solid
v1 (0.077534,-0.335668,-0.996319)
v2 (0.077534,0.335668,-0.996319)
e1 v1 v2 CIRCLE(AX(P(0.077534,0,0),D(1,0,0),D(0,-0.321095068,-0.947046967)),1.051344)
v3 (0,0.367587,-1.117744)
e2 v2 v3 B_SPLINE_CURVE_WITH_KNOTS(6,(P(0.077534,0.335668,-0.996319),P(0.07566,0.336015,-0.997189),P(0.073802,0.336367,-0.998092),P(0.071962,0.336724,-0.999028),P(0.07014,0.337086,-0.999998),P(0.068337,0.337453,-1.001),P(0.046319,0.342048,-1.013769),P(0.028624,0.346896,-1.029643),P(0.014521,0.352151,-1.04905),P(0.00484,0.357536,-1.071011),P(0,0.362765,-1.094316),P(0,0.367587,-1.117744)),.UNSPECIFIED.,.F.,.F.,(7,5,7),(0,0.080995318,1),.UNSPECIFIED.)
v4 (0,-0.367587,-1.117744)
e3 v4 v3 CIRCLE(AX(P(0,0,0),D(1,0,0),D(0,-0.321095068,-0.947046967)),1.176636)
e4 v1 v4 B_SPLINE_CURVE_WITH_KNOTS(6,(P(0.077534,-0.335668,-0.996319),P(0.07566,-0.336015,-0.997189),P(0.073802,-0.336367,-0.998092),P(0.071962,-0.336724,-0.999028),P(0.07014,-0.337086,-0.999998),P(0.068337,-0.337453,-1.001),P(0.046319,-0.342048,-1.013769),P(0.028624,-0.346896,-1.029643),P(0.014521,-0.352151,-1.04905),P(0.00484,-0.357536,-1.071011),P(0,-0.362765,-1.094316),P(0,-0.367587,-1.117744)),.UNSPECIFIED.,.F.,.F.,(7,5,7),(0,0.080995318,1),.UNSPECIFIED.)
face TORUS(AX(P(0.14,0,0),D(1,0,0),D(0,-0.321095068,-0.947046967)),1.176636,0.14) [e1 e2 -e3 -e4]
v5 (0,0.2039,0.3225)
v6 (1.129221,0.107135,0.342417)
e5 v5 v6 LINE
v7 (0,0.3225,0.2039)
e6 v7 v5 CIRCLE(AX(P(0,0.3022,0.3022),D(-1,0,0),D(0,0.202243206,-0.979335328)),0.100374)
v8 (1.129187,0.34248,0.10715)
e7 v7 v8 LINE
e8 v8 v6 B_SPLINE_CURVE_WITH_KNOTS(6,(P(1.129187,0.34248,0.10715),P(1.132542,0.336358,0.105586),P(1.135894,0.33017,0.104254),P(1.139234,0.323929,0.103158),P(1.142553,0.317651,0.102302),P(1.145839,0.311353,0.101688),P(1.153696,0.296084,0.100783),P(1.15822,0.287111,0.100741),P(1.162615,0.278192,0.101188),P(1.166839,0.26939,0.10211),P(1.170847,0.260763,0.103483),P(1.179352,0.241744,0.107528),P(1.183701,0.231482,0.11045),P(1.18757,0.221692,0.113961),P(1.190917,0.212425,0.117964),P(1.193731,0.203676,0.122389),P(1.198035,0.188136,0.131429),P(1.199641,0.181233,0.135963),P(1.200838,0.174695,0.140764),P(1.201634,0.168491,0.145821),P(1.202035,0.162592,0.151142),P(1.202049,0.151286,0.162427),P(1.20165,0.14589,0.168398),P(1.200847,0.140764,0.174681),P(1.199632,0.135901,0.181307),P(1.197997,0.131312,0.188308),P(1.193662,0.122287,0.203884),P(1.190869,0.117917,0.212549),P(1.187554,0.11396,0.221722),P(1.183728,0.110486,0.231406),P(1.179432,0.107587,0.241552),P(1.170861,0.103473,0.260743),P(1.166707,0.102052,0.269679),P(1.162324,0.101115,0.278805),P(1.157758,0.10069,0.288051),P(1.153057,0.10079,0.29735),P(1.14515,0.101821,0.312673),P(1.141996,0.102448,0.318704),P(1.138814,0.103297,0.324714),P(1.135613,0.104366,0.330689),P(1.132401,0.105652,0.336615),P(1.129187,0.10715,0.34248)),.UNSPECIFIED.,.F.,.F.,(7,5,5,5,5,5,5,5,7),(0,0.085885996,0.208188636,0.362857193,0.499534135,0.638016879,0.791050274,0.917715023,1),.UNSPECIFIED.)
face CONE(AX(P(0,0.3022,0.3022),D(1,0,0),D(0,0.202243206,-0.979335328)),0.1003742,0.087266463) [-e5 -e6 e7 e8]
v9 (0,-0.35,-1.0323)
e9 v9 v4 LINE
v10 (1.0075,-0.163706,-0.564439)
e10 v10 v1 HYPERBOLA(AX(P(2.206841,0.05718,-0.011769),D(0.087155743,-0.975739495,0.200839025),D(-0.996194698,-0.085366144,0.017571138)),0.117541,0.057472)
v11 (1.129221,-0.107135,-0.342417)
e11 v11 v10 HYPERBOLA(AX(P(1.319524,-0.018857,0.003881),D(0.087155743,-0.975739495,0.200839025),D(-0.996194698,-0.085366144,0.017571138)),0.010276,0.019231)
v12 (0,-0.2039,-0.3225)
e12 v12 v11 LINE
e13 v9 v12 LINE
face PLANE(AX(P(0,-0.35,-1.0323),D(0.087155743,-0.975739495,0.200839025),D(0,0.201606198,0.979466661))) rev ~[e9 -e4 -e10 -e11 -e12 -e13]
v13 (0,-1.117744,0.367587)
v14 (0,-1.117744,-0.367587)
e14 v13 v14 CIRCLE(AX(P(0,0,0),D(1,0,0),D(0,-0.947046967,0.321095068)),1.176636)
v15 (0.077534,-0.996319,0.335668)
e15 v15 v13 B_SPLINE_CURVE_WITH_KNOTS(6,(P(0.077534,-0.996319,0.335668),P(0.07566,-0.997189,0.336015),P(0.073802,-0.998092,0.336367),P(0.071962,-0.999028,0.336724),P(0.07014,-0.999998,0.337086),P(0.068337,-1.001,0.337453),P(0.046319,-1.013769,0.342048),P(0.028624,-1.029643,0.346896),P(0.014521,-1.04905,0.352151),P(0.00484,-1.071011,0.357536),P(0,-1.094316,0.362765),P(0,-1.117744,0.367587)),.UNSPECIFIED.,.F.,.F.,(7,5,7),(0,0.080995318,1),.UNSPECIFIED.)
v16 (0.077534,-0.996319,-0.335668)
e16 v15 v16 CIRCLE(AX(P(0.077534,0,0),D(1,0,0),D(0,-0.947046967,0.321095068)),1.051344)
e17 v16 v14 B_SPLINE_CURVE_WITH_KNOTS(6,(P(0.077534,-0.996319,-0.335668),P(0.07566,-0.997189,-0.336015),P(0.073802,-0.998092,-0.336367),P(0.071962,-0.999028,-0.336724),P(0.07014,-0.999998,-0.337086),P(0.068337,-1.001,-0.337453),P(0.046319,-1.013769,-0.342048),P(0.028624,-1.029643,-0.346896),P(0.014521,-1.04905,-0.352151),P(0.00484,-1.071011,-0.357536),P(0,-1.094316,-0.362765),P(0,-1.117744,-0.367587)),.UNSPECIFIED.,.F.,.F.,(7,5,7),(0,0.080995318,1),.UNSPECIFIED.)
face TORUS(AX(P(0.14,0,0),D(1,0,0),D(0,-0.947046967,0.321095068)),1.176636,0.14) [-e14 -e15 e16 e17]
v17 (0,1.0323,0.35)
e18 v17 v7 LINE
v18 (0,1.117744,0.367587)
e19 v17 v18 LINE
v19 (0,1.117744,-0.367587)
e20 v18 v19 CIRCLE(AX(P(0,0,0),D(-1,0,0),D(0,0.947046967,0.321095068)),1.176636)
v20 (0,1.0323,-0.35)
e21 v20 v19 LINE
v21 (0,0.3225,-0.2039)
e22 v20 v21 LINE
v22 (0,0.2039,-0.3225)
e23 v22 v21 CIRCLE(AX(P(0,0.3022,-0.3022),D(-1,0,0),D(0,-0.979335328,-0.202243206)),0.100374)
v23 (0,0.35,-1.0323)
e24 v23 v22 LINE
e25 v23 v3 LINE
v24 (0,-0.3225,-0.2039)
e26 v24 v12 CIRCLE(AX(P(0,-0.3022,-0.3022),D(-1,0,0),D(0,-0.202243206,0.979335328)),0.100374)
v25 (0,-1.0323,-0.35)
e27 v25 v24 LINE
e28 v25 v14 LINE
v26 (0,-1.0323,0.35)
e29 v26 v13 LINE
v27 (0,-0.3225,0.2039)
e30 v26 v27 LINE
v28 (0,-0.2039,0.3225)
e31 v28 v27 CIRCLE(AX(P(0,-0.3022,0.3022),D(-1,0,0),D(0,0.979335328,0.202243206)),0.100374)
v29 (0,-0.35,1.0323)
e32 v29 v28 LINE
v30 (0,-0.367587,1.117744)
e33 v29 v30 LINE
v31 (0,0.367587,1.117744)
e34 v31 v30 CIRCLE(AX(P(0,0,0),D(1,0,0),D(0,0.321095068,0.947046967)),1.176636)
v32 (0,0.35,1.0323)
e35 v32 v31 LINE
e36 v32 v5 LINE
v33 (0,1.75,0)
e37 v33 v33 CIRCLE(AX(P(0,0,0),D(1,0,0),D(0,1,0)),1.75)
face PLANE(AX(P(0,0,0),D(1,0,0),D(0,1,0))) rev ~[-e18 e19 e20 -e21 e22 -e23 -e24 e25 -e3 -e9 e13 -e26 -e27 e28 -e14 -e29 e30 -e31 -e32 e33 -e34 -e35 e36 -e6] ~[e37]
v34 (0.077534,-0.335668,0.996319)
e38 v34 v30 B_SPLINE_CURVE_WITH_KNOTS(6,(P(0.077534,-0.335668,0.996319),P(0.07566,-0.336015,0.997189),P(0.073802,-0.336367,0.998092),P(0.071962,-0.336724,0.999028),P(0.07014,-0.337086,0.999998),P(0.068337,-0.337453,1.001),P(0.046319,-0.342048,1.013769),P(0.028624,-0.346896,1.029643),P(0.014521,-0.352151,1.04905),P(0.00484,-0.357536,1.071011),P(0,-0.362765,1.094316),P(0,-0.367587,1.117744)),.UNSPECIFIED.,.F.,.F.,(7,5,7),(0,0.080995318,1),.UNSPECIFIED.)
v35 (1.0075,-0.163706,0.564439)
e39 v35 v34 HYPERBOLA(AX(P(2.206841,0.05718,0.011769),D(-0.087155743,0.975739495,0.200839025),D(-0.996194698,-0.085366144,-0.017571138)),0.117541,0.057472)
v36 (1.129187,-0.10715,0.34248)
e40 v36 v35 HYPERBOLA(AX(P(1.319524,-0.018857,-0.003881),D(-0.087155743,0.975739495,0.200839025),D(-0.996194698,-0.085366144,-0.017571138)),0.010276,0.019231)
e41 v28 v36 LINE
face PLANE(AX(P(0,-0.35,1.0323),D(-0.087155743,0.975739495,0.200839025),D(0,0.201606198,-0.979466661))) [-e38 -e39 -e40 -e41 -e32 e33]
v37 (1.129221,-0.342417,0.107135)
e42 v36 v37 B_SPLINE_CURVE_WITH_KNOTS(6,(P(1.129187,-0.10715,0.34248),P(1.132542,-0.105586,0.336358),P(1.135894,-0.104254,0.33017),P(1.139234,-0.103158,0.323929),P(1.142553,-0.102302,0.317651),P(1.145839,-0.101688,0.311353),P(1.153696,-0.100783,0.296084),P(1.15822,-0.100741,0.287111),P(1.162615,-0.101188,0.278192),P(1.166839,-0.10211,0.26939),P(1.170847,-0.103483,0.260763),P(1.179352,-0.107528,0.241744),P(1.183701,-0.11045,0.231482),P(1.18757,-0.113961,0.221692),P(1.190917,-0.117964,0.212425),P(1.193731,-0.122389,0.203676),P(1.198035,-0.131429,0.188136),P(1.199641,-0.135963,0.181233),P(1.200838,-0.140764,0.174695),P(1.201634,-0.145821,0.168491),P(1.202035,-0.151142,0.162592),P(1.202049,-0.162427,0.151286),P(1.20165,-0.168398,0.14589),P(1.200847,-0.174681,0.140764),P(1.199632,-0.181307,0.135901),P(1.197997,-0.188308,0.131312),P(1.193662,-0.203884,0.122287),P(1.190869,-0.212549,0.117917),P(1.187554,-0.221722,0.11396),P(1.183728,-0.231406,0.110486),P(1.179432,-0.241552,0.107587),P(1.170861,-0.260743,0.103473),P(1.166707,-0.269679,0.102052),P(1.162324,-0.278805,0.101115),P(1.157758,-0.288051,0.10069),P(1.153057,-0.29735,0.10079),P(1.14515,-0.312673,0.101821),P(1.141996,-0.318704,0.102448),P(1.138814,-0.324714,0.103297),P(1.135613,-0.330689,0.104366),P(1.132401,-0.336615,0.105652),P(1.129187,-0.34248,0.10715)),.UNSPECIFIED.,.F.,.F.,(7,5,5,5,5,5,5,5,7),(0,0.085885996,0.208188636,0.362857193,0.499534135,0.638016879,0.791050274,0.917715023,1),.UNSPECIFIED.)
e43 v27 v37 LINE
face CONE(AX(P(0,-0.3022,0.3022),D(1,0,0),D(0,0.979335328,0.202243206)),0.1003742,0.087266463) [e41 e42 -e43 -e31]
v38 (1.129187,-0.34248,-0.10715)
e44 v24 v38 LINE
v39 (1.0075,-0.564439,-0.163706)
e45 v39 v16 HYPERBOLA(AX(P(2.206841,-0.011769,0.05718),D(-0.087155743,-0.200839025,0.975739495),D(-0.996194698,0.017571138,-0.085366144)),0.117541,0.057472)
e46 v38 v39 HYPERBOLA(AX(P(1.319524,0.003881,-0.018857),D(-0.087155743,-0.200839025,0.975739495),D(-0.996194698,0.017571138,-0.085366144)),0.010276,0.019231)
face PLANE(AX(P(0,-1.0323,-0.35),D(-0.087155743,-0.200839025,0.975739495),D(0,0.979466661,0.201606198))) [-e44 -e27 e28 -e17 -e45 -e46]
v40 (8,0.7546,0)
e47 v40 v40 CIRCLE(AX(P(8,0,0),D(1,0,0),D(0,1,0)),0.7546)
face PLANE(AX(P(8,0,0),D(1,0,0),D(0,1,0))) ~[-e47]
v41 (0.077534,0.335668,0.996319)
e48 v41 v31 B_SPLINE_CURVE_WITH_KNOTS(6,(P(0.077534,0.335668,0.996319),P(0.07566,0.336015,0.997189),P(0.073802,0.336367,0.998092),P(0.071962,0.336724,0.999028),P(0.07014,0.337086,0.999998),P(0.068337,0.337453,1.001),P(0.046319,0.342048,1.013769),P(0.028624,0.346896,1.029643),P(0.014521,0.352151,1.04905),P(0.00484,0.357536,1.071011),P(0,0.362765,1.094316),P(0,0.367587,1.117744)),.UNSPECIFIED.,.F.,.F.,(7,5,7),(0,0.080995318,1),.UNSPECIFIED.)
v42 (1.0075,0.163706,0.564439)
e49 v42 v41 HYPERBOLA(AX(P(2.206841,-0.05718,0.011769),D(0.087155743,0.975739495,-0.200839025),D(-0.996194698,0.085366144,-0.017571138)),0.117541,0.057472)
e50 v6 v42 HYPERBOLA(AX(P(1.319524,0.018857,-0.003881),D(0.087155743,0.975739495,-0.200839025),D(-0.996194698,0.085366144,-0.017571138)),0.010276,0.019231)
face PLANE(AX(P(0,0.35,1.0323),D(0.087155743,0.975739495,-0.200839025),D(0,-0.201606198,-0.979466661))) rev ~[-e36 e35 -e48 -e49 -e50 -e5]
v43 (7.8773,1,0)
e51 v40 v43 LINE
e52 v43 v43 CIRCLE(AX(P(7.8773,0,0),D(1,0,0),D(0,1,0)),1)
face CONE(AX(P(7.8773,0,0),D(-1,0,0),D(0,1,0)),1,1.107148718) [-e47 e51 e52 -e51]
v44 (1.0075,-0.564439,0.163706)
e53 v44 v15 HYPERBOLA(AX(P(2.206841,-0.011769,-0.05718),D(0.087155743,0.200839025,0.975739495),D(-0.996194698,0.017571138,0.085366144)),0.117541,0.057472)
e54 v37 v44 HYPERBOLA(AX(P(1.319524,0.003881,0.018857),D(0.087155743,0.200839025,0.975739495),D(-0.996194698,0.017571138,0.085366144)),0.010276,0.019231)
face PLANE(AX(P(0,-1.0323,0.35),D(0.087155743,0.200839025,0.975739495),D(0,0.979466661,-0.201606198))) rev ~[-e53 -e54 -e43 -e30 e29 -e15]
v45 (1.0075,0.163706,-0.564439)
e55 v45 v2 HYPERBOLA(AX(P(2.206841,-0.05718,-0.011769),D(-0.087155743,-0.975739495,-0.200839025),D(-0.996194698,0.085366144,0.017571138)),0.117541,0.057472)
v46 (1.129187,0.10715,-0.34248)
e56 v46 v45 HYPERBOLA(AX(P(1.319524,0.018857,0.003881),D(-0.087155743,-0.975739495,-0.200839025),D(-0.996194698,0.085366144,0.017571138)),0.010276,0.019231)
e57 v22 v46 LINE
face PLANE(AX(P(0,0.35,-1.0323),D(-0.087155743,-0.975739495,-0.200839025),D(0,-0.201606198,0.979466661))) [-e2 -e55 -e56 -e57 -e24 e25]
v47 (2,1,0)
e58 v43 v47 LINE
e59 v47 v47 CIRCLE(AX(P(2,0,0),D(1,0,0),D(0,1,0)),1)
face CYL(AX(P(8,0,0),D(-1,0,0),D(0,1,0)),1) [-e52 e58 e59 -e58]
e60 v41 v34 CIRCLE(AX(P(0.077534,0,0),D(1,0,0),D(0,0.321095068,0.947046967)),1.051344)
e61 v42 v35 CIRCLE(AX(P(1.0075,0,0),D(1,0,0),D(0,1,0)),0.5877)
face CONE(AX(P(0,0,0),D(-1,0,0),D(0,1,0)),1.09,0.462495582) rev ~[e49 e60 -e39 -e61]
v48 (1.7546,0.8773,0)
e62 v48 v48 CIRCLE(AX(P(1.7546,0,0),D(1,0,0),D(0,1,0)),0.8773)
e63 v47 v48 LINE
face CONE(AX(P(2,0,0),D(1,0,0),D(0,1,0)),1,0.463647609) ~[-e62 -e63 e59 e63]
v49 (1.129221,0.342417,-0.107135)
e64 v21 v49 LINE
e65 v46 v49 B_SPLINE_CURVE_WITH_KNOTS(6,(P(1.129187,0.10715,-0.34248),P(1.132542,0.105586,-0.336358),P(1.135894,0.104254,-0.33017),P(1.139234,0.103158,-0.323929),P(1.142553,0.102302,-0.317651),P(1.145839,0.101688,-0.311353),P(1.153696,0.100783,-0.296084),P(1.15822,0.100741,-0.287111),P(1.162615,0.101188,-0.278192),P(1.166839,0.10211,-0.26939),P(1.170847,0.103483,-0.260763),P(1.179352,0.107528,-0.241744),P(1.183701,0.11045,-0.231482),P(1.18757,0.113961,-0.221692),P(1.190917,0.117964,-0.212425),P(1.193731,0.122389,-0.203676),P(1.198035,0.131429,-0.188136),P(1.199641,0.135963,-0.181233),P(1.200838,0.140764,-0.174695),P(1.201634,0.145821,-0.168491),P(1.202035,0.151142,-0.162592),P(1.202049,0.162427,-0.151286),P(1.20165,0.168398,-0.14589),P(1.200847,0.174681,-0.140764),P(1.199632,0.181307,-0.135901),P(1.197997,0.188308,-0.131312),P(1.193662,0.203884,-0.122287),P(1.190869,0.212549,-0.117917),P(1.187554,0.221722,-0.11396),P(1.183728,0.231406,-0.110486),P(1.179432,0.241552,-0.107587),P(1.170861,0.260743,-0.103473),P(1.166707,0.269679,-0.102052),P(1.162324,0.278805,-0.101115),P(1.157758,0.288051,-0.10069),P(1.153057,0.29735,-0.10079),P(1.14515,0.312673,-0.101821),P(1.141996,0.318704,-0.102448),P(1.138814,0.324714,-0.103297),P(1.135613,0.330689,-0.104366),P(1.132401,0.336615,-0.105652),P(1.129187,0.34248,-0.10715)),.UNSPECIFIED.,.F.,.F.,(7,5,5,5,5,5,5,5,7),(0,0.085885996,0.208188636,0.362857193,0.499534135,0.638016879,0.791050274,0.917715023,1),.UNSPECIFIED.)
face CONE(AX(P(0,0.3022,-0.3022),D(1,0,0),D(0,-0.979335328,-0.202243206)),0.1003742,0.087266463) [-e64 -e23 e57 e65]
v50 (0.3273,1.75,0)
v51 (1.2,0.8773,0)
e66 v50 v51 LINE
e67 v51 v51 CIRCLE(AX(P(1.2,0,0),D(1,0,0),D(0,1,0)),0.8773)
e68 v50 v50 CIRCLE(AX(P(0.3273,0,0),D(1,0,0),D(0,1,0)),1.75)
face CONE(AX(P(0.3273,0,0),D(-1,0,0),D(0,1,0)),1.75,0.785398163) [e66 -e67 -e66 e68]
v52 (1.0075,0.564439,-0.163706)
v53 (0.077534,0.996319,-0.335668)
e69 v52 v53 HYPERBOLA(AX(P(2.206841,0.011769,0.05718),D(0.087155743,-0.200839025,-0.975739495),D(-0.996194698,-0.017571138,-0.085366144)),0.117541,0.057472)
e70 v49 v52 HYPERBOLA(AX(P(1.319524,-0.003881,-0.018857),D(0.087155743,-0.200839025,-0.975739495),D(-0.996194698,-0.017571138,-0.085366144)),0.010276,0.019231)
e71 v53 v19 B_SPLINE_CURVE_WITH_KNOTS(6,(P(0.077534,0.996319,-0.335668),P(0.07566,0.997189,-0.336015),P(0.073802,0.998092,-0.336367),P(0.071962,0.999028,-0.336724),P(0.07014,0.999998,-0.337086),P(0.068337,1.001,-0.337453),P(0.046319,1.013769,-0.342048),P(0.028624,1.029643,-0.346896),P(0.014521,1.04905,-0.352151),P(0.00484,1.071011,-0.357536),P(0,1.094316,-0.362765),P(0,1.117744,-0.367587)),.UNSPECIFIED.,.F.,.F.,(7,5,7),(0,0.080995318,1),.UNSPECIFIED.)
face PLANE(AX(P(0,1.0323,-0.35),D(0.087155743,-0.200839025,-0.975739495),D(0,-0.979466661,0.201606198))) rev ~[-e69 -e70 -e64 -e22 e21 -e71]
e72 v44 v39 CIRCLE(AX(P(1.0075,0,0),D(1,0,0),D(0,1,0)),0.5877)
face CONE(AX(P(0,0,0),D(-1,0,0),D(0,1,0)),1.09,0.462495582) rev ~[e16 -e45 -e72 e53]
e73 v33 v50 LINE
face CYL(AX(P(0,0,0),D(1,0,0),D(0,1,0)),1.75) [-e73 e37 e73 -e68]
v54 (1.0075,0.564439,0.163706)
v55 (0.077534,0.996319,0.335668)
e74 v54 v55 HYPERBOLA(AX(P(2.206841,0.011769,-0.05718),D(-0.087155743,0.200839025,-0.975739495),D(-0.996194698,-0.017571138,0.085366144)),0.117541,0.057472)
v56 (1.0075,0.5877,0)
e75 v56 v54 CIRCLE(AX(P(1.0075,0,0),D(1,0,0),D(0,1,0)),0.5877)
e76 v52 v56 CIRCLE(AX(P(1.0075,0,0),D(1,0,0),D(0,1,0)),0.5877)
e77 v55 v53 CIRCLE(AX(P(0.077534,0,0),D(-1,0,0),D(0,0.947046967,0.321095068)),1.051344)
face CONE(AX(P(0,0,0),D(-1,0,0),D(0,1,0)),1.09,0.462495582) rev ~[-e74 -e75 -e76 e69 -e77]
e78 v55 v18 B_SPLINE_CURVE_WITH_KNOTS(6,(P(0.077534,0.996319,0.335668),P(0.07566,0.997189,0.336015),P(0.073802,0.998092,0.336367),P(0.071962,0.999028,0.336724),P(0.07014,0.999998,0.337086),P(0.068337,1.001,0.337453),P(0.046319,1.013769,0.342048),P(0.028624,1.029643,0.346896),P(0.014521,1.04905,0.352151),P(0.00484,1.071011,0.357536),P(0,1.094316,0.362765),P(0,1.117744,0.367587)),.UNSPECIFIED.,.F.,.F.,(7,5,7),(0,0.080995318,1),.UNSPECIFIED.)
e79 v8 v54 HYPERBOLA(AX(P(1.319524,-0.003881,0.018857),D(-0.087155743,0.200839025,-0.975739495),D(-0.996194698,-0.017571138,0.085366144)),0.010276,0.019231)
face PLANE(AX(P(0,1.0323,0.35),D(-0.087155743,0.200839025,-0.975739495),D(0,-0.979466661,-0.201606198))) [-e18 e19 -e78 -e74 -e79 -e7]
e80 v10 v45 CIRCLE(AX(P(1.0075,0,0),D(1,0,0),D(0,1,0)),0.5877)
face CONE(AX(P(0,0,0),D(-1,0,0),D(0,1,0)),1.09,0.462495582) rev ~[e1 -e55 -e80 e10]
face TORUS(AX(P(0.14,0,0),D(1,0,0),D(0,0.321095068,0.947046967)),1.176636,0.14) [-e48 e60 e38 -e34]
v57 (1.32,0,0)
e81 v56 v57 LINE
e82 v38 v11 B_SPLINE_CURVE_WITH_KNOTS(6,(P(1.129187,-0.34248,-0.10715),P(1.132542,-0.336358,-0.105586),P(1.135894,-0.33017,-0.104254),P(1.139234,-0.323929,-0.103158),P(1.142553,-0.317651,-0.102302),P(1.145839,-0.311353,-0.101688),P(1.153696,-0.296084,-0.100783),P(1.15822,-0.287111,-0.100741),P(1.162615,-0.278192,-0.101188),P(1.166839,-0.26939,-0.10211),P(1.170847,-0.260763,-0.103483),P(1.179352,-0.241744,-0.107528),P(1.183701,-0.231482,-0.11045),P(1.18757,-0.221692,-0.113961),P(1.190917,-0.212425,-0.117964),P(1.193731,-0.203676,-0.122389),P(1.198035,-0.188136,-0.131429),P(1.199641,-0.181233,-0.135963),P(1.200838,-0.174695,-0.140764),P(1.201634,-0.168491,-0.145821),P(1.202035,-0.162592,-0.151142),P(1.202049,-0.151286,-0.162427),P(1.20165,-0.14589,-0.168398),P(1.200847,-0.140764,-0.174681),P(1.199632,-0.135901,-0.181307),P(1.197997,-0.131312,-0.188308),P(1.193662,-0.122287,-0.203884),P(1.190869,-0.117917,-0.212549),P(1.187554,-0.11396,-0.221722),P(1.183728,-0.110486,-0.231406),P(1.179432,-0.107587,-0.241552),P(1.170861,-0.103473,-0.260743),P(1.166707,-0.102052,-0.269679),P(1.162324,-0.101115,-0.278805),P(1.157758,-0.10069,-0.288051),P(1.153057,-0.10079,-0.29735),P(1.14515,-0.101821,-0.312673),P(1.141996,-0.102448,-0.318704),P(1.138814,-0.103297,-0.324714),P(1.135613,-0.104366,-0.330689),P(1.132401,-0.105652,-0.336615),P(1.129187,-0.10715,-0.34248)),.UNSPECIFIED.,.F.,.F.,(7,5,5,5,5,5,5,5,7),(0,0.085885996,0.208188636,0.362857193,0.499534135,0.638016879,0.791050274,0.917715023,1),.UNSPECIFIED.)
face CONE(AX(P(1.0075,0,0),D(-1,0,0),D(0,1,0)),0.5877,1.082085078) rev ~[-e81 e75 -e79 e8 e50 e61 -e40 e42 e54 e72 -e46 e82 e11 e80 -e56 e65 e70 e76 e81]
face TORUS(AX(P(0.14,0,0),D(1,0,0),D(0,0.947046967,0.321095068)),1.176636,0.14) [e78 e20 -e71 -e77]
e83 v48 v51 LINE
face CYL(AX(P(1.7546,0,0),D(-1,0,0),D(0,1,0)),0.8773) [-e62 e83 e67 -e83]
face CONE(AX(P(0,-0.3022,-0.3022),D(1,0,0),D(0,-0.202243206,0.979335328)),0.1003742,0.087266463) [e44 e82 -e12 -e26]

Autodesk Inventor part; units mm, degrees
ref_plane "YZ Plane" through (0, 0, 0) normal (1, 0, 0) x (0, 1, 0)
ref_plane "XZ Plane" through (0, 0, 0) normal (0, 1, 0) x (-1, 0, 0)
sketch "Sketch1" plane through (0, 0, 0) normal (0, 0, 1) x (1, 0, 0)
  line L0 (1.32, 0) -> (8, 0)
  line L1 (8, 0) -> (8, 1)
  line L2 (8, 1) -> (2, 1)
  line L3 (2, 1) -> (1.7546, 0.8773)
  line L4 (1.7546, 0.8773) -> (1.2, 0.8773)
  line L5 (0, 1.75) -> (0, 1.09)
  line L6 (0, 1.09) -> (1.0075, 0.5877)
  line L7 (1.0075, 0.5877) -> (1.32, 0)
  line L8 (-1.6, 0) -> (9.6, 0) projected
  line L9 (0, -0.35) -> (0, 2.1) projected
  line L10 (0, 1.75) -> (0.3273, 1.75)
  line L11 (0.3273, 1.75) -> (1.2, 0.8773)
  line L12 (2, 1) -> (1.0773, 1) construction
  dimension "d1" = 6
  dimension "d2" = 2
  dimension "d3" = 1.7546
  dimension "d4" = 2.18
  dimension "d5" = 26.5
  dimension "d6" = 62
  dimension "d7" = 1.32
  dimension "d8" = 0.2454
  dimension "d12" = 3.5
  dimension "d13" = 45
  dimension "d15" = 8
  dimension "d24" = 1.2
revolve "Body" add sketch "Sketch1" angle 360 about axis through (1.32, 0, 0) along (1, 0, 0) contours L7 L6 L5 L10 L11 L4 L3 L2 L1 L0
sketch "Sketch2" plane through (0, 0, 0) normal (-1, 0, 0) x (0, 0, 1)
  line L0 (0, 1.09) -> (0, 0) construction
  line L1 (0, 0) -> (1.09, 0) construction
  arc A0 (0.327, 0) -> (0, 0.327) centre (0, 0) ccw construction
  arc A1 (0.3815, 0) -> (0, 0.3815) centre (0, 0) ccw construction
  arc A2 (1.0323, 0.35) -> (0.35, 1.0323) centre (0, 0) ccw
  line L2 (0, 0) -> (0.7707, 0.7707) construction
  line L3 (0.35, 1.0323) -> (0.2039, 0.3225)
  line L4 (1.0323, 0.35) -> (0.3225, 0.2039)
  arc A3 (0.35, 1.0323) -> (0, 1.09) centre (0, 0) ccw
  arc A4 (1.09, 0) -> (1.0323, 0.35) centre (0, 0) ccw
  line L5 (0, -2.45) -> (0, 2.45) projected
  line L6 (-2.45, 0) -> (2.45, 0) projected
  arc A5 (0.35, -1.0323) -> (1.0323, -0.35) centre (0, 0) ccw
  line L7 (0.35, -1.0323) -> (0.2039, -0.3225)
  line L8 (1.0323, -0.35) -> (0.3225, -0.2039)
  arc A6 (0, -1.09) -> (0.35, -1.0323) centre (0, 0) ccw
  arc A7 (1.0323, -0.35) -> (1.09, 0) centre (0, 0) ccw
  arc A8 (-0.35, 1.0323) -> (-1.0323, 0.35) centre (0, 0) ccw
  line L9 (-0.35, 1.0323) -> (-0.2039, 0.3225)
  line L10 (-1.0323, 0.35) -> (-0.3225, 0.2039)
  arc A9 (0, 1.09) -> (-0.35, 1.0323) centre (0, 0) ccw
  arc A10 (-1.0323, 0.35) -> (-1.09, 0) centre (0, 0) ccw
  arc A11 (-0.35, -1.0323) -> (0, -1.09) centre (0, 0) ccw
  arc A12 (-1.0323, -0.35) -> (-0.35, -1.0323) centre (0, 0) ccw
  arc A13 (-1.09, 0) -> (-1.0323, -0.35) centre (0, 0) ccw
  line L11 (-1.0323, -0.35) -> (-0.3225, -0.2039)
  line L12 (-0.35, -1.0323) -> (-0.2039, -0.3225)
  arc A14 (0.2039, 0.3225) -> (0.3225, 0.2039) centre (0.3022, 0.3022) ccw
  arc A15 (0.3225, -0.2039) -> (0.2039, -0.3225) centre (0.3022, -0.3022) ccw
  arc A16 (-0.3225, 0.2039) -> (-0.2039, 0.3225) centre (-0.3022, 0.3022) ccw
  arc A17 (-0.2039, -0.3225) -> (-0.3225, -0.2039) centre (-0.3022, -0.3022) ccw
  point P0 (0.7707, -0.7707)
  point P1 (-0.7707, 0.7707)
  point P2 (-0.7707, -0.7707)
  dimension "d17" = 0.654
  dimension "d18" = 0.763
  dimension "d19" = 2.18
  dimension "d20" = 45
  dimension "d21" = 0.35
extrude "Slot" add sketch "Sketch2" against normal up to next draft 5 contours L4 A14 L3 A2 | A5 L7 A15 L8 | L9 A16 L10 A8 | A12 L11 A17 L12
fillet "Fillet1" radius 0.14 4 edges at (0, 1.09, 0) (0, 0, -1.09) (0, -1.09, 0) (0, 0, 1.09)
thread "Thread" size "M2x0.4" class "6g" standard "ISO Metric profile" length 6
chamfer "Chamfer1" distance 0.2454 distance2 0.1227 1 edges at (8, -1, 0) measured on face at (8, -0.1182, -0.3117)
ref_plane "Work Plane2" through (3.35, 0, 0) normal (0, 0, -1) x (1, 0, 0)
equation "\"d1\" = GEL"
equation "\"d2\" = GD"
equation "\"d3\" = BDM"
equation "\"d4\" = SDM"
equation "\"d7\" = INTI"
equation "\"d8\" = GAL"
equation "\"d12\" = KOD"
equation "\"d13\" = 0.5 * SEWI"
equation "\"d15\" = NLG"
equation "\"d24\" = KOH"
equation "\"d17\" = 0.3 * SDM"
equation "\"d18\" = 0.35 * SDM"
equation "\"d19\" = SDM"
equation "\"d21\" = 0.5 * SBR"
equation "\"d23\" = 0.2 * SBR"
equation "\"d10\" = GEL"
equation "\"d25\" = -0.5 * SPD + 0.5 * GD"
equation "\"d26\" = 0.5 * GAL"
equation "\"NLG\" = 8"
equation "\"GEL\" = 6"
equation "\"GAL\" = 0.61345 * PTC"
equation "\"SPD\" = NND - 1.2269 * PTC"
equation "\"KOD\" = 3.5"
equation "\"KOH\" = 1.2"
equation "\"SBR\" = 0.7"
equation "\"INTI\" = 1.32"
equation "\"SDM\" = 2.18"
equation "\"GD\" = NND"
equation "\"BDM\" = NND - GAL"
equation "\"SEWI\" = 90deg"
equation "\"d9\" = SDM"
equation "\"GUL\" = 0.61345 * PTC"
equation "\"TOA\" = 30deg"
equation "\"EPV\" = 2.2"
equation "\"THREADDIA\" = 2"
equation "\"RR\" = 0.2"
equation "\"PTC\" = 0.4"
equation "\"NND\" = 2"
equation "\"GD1\" = THREADDIA - 1.2269 * PTC"
properties part number "AS 1427 - M2 x 8" material "Steel, Mild"
